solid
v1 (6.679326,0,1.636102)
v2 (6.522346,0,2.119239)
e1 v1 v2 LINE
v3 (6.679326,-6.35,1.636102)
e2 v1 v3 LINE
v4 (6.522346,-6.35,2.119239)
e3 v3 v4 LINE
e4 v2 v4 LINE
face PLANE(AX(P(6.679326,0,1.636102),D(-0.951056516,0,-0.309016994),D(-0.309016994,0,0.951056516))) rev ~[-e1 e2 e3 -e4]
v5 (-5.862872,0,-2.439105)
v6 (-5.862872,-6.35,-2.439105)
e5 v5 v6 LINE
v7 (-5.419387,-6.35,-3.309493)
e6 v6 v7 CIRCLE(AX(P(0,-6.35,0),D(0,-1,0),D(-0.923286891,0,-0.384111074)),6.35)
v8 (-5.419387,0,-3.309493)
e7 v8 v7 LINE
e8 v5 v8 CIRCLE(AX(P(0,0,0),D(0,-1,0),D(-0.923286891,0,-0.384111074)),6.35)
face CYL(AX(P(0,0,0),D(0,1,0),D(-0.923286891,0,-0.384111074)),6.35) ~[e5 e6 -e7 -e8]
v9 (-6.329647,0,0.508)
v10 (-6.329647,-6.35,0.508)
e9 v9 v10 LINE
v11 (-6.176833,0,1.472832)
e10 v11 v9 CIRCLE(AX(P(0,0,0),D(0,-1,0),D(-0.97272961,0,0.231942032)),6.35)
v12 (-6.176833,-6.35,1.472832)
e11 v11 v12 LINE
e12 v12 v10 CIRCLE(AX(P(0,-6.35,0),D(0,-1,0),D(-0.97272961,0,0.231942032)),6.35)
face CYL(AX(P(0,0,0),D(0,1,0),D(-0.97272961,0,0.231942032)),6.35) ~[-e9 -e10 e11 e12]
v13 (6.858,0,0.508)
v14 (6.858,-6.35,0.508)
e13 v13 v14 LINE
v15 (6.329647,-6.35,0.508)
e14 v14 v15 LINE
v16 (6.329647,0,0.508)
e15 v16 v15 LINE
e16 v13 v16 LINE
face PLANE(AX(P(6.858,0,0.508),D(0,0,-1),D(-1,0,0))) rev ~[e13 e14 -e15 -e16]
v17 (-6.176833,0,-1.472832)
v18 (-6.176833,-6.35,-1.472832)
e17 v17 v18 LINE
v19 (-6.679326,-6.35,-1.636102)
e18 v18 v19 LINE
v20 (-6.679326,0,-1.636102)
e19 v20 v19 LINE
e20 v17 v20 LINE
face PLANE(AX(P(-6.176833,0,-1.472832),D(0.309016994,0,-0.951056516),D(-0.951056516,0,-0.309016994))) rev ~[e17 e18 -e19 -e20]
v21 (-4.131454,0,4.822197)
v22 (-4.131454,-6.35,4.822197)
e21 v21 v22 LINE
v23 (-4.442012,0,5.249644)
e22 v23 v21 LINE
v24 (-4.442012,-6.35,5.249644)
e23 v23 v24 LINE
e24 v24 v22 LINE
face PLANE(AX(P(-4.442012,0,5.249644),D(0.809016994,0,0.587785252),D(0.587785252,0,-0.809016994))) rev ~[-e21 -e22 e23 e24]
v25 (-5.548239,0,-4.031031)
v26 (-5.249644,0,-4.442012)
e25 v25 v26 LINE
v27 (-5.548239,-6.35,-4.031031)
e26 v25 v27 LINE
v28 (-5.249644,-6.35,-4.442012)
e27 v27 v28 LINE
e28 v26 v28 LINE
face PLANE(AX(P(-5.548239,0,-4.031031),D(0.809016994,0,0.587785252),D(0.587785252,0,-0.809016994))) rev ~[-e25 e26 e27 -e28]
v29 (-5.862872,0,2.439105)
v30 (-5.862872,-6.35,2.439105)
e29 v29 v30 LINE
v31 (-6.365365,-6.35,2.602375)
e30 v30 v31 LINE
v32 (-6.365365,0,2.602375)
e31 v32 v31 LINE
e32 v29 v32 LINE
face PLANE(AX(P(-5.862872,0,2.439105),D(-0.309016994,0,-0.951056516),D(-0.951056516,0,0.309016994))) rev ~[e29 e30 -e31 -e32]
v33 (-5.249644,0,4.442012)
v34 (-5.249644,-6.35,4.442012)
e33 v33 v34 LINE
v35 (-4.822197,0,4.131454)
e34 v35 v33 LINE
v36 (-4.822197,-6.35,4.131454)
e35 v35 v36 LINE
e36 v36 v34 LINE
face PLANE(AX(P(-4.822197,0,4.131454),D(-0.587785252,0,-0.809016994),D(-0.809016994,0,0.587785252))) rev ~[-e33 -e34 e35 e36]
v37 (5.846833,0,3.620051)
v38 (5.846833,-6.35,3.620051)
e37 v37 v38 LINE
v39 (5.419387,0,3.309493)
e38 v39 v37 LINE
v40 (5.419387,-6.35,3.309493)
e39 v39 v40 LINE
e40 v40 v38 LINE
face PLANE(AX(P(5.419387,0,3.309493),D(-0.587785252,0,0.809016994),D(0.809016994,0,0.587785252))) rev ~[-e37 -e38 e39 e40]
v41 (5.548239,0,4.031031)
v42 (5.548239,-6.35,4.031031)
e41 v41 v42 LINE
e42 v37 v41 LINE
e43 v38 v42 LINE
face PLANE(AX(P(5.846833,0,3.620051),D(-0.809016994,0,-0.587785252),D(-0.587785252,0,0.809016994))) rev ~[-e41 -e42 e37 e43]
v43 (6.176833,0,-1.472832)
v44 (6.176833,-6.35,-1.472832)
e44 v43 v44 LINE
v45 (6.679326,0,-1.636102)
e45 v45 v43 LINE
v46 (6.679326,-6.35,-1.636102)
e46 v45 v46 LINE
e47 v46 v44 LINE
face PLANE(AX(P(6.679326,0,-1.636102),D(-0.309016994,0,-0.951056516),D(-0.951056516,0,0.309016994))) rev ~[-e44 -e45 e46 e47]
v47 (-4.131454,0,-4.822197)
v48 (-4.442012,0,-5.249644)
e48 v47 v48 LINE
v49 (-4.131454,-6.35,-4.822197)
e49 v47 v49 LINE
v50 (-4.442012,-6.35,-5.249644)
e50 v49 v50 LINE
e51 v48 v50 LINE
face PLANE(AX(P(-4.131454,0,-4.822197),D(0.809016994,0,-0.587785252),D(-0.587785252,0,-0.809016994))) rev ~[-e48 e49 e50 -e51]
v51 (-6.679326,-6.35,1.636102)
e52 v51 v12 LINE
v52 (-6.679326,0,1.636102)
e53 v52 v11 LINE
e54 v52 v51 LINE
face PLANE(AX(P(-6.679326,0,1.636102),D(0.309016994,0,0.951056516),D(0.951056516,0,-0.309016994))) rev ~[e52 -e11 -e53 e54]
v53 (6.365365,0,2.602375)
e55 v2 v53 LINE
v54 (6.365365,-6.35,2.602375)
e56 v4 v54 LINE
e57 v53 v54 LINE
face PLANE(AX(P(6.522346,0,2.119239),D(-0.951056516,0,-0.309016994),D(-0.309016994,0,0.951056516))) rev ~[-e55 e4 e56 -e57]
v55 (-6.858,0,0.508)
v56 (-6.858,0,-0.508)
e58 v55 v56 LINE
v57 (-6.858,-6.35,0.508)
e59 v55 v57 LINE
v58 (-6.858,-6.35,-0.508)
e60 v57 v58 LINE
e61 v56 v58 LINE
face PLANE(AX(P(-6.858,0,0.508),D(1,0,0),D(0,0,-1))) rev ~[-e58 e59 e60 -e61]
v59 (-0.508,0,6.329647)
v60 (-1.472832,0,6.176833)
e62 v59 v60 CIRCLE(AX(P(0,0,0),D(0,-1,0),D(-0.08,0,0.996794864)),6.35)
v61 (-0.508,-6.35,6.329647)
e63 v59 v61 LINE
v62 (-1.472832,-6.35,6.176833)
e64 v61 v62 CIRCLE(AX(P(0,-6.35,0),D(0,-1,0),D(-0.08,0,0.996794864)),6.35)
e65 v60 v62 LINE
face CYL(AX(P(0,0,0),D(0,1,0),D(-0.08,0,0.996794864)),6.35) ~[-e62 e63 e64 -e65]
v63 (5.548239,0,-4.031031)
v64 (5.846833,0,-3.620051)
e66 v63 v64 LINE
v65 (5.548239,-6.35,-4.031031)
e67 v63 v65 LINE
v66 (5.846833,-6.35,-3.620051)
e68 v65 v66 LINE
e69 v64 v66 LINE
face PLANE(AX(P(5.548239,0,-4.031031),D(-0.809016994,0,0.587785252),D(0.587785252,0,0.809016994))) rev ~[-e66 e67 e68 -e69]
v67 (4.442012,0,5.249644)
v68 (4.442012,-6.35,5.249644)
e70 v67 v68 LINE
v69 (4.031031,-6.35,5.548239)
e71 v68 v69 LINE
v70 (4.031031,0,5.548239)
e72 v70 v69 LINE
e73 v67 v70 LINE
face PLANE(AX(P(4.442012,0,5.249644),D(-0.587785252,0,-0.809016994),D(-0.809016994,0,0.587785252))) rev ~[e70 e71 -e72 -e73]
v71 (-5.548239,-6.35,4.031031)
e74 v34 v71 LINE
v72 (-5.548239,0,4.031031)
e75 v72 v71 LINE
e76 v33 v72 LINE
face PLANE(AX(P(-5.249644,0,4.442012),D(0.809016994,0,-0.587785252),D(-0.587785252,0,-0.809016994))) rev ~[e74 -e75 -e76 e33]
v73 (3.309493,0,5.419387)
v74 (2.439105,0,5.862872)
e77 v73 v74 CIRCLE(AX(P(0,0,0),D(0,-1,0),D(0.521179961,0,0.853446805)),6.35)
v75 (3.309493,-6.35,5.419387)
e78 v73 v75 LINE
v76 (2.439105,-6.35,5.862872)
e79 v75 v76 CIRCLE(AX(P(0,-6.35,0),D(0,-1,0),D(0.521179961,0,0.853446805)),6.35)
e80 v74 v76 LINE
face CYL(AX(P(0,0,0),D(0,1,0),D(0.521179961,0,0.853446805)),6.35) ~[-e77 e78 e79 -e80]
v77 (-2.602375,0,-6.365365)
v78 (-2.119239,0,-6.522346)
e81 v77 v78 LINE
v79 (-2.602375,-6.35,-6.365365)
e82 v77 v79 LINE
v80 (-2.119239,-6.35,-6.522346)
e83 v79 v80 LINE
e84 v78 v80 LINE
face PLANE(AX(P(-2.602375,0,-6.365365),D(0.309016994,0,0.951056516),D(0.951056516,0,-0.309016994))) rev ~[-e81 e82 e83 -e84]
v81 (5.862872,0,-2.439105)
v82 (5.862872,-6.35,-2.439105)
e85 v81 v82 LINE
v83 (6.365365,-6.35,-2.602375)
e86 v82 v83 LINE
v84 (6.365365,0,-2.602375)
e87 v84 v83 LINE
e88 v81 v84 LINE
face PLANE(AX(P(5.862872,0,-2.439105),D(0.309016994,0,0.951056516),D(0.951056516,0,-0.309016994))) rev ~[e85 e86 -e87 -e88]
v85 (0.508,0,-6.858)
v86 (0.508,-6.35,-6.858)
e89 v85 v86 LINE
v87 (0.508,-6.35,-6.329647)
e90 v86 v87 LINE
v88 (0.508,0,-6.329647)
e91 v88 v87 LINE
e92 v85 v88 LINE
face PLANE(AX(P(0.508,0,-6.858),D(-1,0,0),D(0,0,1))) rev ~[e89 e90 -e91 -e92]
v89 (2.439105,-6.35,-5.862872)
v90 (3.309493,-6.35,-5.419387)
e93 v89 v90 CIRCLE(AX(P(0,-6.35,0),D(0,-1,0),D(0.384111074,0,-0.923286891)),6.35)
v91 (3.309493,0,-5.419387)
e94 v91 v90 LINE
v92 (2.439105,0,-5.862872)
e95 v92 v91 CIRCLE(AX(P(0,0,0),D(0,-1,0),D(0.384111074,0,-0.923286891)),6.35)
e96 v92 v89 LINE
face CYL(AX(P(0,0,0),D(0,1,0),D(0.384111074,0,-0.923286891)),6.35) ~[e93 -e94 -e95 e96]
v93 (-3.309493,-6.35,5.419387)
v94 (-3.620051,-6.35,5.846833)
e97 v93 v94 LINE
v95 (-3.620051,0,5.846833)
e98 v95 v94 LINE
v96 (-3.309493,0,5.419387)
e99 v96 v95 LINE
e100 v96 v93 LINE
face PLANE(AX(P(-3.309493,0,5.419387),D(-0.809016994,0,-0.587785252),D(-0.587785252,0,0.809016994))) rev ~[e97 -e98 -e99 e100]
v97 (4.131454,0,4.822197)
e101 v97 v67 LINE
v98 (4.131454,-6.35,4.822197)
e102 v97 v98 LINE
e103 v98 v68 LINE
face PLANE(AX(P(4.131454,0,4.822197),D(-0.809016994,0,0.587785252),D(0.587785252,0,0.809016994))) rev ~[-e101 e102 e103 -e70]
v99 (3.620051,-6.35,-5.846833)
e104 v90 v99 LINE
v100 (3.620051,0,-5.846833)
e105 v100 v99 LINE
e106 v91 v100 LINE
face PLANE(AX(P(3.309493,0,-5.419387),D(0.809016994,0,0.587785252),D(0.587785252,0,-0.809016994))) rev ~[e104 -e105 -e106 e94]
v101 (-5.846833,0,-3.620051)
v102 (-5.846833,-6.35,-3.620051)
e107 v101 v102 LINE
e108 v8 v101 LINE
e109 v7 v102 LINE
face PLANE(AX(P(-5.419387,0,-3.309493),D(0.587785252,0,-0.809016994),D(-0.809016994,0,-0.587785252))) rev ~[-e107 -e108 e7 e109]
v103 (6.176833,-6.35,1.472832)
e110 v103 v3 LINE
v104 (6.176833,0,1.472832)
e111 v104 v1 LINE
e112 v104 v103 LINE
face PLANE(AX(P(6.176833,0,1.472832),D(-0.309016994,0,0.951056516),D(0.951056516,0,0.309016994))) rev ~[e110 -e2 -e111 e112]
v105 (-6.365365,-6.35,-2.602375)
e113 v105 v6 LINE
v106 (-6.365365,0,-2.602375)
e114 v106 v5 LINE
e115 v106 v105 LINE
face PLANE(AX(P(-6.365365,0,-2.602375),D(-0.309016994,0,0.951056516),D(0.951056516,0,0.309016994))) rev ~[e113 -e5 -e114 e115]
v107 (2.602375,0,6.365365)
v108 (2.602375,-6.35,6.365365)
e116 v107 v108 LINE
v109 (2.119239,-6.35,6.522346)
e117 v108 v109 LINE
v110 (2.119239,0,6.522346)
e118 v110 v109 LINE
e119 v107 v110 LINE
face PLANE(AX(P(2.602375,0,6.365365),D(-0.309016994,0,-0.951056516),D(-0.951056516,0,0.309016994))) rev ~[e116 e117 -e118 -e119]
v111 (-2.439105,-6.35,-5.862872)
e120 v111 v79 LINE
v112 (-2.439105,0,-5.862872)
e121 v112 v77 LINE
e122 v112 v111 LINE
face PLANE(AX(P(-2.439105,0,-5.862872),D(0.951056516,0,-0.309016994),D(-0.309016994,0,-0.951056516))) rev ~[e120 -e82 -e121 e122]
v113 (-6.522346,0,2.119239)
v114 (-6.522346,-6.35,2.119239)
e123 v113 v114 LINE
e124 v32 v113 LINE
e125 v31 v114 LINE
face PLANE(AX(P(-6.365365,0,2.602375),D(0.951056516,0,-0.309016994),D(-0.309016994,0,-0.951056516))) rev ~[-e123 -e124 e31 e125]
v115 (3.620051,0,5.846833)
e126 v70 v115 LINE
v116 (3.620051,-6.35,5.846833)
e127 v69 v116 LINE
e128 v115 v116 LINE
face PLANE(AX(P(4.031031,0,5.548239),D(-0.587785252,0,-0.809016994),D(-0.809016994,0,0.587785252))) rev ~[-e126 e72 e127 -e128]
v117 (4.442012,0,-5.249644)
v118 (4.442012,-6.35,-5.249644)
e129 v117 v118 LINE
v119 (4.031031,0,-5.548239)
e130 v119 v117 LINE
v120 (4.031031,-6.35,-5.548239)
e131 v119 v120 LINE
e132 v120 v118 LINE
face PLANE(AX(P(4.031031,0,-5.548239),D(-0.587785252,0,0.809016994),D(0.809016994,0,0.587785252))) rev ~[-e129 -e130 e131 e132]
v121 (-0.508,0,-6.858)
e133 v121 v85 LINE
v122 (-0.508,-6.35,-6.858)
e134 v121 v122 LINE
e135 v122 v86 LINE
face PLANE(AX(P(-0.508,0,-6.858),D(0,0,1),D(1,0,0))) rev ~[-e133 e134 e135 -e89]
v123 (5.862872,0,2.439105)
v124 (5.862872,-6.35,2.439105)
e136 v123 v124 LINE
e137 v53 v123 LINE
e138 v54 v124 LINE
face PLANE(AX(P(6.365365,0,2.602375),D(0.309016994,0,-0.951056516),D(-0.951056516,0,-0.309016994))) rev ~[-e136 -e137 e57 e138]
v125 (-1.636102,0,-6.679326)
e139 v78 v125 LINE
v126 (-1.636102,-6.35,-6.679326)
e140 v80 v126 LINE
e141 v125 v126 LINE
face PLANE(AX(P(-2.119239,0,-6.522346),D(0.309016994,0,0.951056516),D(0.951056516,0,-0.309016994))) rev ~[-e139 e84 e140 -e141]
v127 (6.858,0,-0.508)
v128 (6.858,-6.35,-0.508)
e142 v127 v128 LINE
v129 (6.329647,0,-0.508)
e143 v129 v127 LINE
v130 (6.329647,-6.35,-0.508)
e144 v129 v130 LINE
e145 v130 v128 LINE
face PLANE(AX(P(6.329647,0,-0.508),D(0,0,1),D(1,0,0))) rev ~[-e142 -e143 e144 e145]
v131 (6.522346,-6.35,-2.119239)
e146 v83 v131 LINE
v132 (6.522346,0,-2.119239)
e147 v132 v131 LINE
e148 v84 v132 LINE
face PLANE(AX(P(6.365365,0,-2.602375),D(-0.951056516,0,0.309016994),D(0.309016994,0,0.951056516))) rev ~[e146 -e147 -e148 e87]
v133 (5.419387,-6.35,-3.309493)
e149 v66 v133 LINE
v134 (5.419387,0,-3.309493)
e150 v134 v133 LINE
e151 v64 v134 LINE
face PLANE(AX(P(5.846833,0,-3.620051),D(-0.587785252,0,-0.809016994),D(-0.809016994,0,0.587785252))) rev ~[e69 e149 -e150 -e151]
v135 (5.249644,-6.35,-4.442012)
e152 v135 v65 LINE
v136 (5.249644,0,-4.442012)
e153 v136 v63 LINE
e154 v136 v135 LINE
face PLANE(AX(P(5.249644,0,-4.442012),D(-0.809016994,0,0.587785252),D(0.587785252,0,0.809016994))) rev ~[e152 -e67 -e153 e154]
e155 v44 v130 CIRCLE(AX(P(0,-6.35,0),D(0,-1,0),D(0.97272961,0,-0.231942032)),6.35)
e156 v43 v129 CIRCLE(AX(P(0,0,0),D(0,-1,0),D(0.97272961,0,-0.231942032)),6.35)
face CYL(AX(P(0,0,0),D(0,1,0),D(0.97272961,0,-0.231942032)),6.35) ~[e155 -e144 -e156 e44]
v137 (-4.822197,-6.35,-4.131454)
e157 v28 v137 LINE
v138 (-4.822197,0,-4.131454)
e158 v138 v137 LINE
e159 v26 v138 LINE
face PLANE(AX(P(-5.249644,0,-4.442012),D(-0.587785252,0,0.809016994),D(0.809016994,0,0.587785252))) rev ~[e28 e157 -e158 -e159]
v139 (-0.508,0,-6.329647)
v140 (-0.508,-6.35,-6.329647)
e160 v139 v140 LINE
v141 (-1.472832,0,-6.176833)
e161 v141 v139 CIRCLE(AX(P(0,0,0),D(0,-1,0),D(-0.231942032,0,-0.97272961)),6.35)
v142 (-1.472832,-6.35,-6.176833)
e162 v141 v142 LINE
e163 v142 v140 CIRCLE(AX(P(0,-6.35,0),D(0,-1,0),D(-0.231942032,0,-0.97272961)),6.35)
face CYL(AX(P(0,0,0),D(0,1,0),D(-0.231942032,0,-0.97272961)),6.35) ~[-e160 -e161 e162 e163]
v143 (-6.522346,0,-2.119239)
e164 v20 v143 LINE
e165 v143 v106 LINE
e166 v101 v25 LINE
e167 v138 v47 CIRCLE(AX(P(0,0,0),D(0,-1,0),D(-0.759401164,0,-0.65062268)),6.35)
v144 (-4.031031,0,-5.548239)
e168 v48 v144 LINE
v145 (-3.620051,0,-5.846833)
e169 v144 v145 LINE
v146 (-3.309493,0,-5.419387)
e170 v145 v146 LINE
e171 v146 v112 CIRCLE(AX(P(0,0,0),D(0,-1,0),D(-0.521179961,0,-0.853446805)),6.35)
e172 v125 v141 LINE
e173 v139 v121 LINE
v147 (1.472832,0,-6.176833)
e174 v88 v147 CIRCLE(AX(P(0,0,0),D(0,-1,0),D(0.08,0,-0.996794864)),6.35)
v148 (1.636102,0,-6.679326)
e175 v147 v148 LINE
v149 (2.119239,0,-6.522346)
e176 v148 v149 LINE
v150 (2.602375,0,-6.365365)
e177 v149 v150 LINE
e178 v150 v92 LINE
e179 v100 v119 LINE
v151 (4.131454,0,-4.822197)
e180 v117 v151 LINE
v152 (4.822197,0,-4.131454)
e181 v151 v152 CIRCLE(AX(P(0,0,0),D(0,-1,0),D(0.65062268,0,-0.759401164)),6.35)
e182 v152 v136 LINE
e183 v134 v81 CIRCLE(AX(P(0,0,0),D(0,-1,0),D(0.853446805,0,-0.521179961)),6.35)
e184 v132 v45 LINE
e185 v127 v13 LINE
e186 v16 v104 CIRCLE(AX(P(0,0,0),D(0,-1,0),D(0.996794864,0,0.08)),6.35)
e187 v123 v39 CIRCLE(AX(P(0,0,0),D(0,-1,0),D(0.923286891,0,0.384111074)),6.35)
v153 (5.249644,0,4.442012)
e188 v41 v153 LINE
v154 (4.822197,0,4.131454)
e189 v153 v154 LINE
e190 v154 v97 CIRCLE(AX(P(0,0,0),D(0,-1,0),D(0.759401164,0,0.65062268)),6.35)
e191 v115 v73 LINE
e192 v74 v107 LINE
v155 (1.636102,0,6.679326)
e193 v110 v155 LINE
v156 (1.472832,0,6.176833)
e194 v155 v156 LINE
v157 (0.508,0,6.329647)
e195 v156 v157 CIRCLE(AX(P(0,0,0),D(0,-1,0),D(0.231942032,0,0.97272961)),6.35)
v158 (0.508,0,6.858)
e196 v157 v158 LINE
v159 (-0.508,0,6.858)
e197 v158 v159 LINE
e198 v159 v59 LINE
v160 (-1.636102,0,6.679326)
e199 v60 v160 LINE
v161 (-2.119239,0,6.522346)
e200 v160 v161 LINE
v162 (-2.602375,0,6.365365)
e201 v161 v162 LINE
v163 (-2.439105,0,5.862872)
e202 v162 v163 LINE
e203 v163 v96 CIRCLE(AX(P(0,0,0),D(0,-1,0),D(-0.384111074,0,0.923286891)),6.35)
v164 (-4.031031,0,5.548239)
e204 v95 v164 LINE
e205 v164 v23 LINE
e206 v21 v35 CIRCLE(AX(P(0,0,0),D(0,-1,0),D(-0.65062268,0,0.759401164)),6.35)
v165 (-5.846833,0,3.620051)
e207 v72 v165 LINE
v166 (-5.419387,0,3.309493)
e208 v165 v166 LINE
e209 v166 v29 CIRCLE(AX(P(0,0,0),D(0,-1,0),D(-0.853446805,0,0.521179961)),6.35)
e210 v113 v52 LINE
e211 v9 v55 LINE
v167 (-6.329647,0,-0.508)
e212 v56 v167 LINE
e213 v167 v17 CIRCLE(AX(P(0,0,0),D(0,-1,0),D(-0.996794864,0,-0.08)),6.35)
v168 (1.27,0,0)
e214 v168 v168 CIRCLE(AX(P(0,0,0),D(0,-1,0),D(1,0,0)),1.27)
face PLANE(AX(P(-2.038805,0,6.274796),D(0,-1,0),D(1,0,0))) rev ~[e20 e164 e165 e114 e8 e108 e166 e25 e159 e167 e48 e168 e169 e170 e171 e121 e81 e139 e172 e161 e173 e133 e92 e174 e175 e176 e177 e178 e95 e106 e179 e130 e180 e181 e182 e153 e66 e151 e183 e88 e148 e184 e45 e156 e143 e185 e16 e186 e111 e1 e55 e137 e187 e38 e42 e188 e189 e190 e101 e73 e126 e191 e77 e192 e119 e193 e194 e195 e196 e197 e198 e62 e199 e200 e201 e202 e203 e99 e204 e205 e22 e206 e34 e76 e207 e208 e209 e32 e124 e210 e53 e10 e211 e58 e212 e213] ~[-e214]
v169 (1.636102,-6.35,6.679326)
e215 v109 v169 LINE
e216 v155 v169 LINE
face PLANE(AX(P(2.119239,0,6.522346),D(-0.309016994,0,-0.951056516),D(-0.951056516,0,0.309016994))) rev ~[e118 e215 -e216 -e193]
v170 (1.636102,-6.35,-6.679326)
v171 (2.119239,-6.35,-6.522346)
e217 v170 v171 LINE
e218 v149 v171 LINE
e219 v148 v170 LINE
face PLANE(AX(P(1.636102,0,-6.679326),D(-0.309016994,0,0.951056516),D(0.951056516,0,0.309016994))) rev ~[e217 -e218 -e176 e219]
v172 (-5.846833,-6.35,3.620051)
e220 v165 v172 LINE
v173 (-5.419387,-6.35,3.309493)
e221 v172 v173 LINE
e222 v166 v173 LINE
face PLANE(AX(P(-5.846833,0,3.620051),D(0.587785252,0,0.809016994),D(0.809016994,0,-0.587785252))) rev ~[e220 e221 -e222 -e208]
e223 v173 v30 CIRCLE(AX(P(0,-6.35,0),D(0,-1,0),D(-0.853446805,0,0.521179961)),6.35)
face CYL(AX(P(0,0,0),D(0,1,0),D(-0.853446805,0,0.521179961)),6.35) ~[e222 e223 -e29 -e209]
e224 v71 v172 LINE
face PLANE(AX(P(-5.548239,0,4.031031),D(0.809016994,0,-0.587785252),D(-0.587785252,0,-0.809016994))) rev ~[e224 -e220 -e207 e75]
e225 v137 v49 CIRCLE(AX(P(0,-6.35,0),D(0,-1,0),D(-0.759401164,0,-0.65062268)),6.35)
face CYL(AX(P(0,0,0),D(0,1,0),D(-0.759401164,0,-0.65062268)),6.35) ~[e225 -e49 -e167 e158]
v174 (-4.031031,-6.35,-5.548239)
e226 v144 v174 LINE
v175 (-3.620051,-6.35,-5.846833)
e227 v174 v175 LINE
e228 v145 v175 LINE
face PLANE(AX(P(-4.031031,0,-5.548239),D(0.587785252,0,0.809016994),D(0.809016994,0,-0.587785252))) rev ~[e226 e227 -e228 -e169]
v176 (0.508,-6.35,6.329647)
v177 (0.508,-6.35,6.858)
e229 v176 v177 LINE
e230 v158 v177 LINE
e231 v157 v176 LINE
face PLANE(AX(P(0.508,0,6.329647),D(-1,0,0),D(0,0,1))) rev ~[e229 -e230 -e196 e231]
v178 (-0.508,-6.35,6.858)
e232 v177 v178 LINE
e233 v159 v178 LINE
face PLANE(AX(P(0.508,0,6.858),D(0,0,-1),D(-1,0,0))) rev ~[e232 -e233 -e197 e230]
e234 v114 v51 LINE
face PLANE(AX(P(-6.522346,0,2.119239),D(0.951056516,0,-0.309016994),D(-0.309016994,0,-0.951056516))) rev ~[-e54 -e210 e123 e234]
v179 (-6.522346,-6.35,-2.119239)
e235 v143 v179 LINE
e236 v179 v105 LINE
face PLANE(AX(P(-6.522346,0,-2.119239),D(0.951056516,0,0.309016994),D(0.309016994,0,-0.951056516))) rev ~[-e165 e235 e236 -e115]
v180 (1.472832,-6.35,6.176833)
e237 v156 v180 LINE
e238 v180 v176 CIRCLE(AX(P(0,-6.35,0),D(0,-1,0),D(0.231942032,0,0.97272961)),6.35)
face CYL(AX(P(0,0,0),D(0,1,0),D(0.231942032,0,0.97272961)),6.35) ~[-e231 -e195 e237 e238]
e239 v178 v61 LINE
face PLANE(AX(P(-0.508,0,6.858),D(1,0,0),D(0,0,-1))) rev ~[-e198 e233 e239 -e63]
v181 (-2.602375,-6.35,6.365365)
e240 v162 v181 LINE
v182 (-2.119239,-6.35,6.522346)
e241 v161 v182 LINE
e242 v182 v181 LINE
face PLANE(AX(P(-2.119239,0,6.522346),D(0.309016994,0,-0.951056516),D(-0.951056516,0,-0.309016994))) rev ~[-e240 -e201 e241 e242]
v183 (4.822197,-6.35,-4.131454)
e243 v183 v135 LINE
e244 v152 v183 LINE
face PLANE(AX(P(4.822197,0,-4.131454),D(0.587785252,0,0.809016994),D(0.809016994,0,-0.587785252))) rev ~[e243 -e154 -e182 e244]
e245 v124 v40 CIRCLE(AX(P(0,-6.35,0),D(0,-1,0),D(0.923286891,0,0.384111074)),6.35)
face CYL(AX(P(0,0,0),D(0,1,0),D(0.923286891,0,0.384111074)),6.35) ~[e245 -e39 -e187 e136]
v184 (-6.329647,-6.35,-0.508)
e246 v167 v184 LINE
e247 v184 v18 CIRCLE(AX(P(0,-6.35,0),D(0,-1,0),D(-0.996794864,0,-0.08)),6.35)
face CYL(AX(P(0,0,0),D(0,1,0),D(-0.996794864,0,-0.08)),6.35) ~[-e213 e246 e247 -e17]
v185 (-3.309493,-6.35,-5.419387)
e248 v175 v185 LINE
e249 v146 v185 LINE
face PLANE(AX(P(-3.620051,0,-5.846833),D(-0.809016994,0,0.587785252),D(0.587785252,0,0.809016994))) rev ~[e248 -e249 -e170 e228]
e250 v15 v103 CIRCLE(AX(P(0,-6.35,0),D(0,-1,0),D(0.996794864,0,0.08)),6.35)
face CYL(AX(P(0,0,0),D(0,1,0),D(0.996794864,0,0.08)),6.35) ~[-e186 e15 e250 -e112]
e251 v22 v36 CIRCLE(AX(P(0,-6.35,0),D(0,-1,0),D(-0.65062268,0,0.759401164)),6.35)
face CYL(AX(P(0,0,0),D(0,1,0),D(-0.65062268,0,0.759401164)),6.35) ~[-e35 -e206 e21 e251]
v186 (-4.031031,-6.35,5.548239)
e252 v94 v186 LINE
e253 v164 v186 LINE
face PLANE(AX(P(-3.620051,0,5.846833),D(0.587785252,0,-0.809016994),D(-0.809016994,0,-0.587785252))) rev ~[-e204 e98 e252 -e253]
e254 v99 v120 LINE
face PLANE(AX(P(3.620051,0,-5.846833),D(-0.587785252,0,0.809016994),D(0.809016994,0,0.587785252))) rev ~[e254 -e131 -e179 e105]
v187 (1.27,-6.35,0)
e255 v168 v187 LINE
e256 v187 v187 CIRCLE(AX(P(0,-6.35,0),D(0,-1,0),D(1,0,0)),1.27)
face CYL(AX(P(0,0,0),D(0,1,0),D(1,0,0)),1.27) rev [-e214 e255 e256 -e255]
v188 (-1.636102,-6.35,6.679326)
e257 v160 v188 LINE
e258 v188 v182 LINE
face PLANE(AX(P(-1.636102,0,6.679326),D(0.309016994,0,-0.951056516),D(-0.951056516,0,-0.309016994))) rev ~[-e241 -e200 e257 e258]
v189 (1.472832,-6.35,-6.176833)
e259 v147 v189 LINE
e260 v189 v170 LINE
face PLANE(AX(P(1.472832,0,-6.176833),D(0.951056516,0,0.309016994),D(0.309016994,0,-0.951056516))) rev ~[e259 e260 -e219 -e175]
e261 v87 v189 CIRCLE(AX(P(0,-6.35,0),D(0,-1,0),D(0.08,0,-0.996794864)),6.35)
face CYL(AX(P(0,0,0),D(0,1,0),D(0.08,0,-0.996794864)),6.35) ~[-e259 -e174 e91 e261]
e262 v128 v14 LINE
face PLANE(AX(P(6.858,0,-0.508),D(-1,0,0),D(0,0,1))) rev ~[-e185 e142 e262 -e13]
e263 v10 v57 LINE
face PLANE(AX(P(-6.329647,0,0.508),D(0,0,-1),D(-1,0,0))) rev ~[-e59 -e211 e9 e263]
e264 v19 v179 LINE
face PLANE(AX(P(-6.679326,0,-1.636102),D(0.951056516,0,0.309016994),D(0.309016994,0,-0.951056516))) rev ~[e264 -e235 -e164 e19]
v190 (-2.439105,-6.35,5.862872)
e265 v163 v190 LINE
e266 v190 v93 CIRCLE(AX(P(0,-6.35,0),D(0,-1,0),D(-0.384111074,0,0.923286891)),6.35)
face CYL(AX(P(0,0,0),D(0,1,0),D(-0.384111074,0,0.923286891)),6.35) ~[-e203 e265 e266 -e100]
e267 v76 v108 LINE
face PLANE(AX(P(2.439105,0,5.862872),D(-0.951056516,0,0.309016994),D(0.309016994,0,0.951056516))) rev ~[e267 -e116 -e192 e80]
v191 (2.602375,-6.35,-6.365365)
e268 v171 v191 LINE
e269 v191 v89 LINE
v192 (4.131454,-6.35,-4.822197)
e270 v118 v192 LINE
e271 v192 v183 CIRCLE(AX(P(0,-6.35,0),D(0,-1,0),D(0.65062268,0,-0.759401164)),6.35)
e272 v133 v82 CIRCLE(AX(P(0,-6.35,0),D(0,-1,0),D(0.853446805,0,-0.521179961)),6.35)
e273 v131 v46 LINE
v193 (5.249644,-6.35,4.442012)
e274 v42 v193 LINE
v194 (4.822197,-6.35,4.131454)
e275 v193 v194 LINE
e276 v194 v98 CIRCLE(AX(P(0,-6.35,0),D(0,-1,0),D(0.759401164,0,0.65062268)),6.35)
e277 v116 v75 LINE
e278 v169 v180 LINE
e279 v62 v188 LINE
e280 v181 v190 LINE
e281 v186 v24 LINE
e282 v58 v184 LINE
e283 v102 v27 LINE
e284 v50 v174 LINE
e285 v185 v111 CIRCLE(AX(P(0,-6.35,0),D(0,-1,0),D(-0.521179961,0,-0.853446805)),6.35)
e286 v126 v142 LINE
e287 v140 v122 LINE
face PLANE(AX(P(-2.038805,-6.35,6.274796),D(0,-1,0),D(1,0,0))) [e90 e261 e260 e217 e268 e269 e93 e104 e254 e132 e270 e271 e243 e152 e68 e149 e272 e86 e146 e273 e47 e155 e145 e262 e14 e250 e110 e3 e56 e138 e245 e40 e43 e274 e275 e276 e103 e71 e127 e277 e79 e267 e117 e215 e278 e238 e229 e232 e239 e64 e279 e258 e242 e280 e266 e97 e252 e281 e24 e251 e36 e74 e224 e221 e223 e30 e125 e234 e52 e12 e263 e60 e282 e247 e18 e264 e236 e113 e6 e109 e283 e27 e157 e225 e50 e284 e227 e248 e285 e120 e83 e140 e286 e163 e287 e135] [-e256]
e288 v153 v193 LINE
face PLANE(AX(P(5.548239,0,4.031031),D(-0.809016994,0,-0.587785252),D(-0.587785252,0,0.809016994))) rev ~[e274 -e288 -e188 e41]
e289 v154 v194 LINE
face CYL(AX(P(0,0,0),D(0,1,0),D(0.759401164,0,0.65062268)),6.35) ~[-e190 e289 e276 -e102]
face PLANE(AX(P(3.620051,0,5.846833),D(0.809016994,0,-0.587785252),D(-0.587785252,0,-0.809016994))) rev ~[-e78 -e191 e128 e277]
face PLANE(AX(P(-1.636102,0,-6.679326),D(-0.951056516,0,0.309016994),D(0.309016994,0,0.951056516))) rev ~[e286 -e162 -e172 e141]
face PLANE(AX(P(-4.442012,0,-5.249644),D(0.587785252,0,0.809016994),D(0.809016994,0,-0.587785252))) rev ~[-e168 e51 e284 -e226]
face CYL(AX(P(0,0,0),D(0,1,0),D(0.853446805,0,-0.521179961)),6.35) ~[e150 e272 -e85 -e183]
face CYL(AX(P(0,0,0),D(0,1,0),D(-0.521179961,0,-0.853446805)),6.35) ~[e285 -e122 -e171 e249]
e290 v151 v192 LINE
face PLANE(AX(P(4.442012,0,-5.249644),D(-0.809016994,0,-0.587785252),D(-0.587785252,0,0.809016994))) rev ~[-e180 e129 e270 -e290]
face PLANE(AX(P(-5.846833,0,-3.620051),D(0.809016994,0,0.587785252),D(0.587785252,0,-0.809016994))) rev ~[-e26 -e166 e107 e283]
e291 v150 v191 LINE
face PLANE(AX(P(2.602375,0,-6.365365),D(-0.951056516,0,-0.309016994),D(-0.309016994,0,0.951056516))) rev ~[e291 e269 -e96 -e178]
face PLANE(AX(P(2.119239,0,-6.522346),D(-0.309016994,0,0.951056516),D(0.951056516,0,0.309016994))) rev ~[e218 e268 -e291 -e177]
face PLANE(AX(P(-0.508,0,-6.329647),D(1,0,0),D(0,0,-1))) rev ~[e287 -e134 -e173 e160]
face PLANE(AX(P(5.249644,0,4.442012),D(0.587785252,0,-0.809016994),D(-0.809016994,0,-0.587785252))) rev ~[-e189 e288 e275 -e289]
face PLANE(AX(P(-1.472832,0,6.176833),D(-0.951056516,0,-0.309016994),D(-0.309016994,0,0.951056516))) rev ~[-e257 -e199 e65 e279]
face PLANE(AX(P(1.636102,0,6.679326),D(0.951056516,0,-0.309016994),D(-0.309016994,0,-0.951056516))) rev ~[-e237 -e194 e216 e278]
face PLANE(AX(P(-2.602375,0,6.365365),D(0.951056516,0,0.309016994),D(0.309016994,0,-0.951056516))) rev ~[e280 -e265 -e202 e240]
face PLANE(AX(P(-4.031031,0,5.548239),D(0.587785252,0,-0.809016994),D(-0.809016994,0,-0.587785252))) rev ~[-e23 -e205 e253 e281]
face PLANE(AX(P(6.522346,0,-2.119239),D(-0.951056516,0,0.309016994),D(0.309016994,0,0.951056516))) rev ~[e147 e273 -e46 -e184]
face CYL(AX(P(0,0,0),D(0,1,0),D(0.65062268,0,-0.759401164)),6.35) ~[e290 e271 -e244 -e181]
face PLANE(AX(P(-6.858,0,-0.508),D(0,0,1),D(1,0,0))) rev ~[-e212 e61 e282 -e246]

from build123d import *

# Parameters (mm, degrees)
F0_R     = 1.27
F1_DEPTH = 6.35


# Not quite as in the source:
# - a feature names something its author has since deleted; it is built from what else it names


with BuildPart() as f1:
    # F0 (on Front) → F1 (new body)
    with BuildSketch(Plane.XZ):
        with BuildLine():
            ThreePointArc((-2.4391053202, 5.8628717568), (-1.9622579143, 6.0392088785), (-1.4728318996, 6.1768330231))
            Line((-1.4728318996, 6.1768330231), (-1.6361018371, 6.6793262219))
            Line((-1.6361018371, 6.6793262219), (-2.1192385474, 6.5223455888))
            Line((-2.1192385474, 6.5223455888), (-2.6023752577, 6.3653649556))
            Line((-2.6023752577, 6.3653649556), (-2.4391053202, 5.8628717568))
        make_face()
        with BuildLine():
            ThreePointArc((-0.508, 6.3296473835), (-0.2542037711, 6.3449098057), (0, 6.35))
            Line((0, 6.35), (0, 6.858))
            Line((0, 6.858), (-0.508, 6.858))
            Line((-0.508, 6.858), (-0.508, 6.3296473835))
        make_face()
        with BuildLine():
            ThreePointArc((0, 6.35), (0.2542037711, 6.3449098057), (0.508, 6.3296473835))
            Line((0.508, 6.3296473835), (0.508, 6.858))
            Line((0.508, 6.858), (0, 6.858))
            Line((0, 6.858), (0, 6.35))
        make_face()
        with BuildLine():
            ThreePointArc((1.4728318996, 6.1768330231), (1.9622579143, 6.0392088785), (2.4391053202, 5.8628717568))
            Line((2.4391053202, 5.8628717568), (2.6023752577, 6.3653649556))
            Line((2.6023752577, 6.3653649556), (2.1192385474, 6.5223455888))
            Line((2.1192385474, 6.5223455888), (1.6361018371, 6.6793262219))
            Line((1.6361018371, 6.6793262219), (1.4728318996, 6.1768330231))
        make_face()
        with BuildLine():
            ThreePointArc((3.3094927511, 5.4193872099), (3.7324363521, 5.1372579143), (4.1314540174, 4.8221973935))
            Line((4.1314540174, 4.8221973935), (4.4420118934, 5.2496436393))
            Line((4.4420118934, 5.2496436393), (4.0310312602, 5.5482385474))
            Line((4.0310312602, 5.5482385474), (3.6200506271, 5.8468334556))
            Line((3.6200506271, 5.8468334556), (3.3094927511, 5.4193872099))
        make_face()
        with BuildLine():
            ThreePointArc((4.8221973935, 4.1314540174), (5.1372579143, 3.7324363521), (5.4193872099, 3.3094927511))
            Line((5.4193872099, 3.3094927511), (5.8468334556, 3.6200506271))
            Line((5.8468334556, 3.6200506271), (5.5482385474, 4.0310312602))
            Line((5.5482385474, 4.0310312602), (5.2496436393, 4.4420118934))
            Line((5.2496436393, 4.4420118934), (4.8221973935, 4.1314540174))
        make_face()
        with BuildLine():
            Line((0.508, -6.858), (0.508, -6.3296473835))
            ThreePointArc((0.508, -6.3296473835), (0, -6.35), (-0.508, -6.3296473835))
            Line((-0.508, -6.3296473835), (-0.508, -6.858))
            Line((-0.508, -6.858), (0, -6.858))
            Line((0, -6.858), (0.508, -6.858))
        make_face()
        with BuildLine():
            Line((2.6023752577, -6.3653649556), (2.4391053202, -5.8628717568))
            ThreePointArc((2.4391053202, -5.8628717568), (1.9622579143, -6.0392088785), (1.4728318996, -6.1768330231))
            Line((1.4728318996, -6.1768330231), (1.6361018371, -6.6793262219))
            Line((1.6361018371, -6.6793262219), (2.1192385474, -6.5223455888))
            Line((2.1192385474, -6.5223455888), (2.6023752577, -6.3653649556))
        make_face()
        with BuildLine():
            Line((4.4420118934, -5.2496436393), (4.1314540174, -4.8221973935))
            ThreePointArc((4.1314540174, -4.8221973935), (3.7324363521, -5.1372579143), (3.3094927511, -5.4193872099))
            Line((3.3094927511, -5.4193872099), (3.6200506271, -5.8468334556))
            Line((3.6200506271, -5.8468334556), (4.0310312602, -5.5482385474))
            Line((4.0310312602, -5.5482385474), (4.4420118934, -5.2496436393))
        make_face()
        with BuildLine():
            Line((5.8468334556, -3.6200506271), (5.4193872099, -3.3094927511))
            ThreePointArc((5.4193872099, -3.3094927511), (5.1372579143, -3.7324363521), (4.8221973935, -4.1314540174))
            Line((4.8221973935, -4.1314540174), (5.2496436393, -4.4420118934))
            Line((5.2496436393, -4.4420118934), (5.5482385474, -4.0310312602))
            Line((5.5482385474, -4.0310312602), (5.8468334556, -3.6200506271))
        make_face()
        with BuildLine():
            Line((6.6793262219, -1.6361018371), (6.1768330231, -1.4728318996))
            ThreePointArc((6.1768330231, -1.4728318996), (6.0392088785, -1.9622579143), (5.8628717568, -2.4391053202))
            Line((5.8628717568, -2.4391053202), (6.3653649556, -2.6023752577))
            Line((6.3653649556, -2.6023752577), (6.5223455888, -2.1192385474))
            Line((6.5223455888, -2.1192385474), (6.6793262219, -1.6361018371))
        make_face()
        with BuildLine():
            ThreePointArc((6.3296473835, 0.508), (6.3449098057, 0.2542037711), (6.35, 0))
            ThreePointArc((6.35, 0), (6.3449098057, -0.2542037711), (6.3296473835, -0.508))
            Line((6.3296473835, -0.508), (6.858, -0.508))
            Line((6.858, -0.508), (6.858, 0))
            Line((6.858, 0), (6.858, 0.508))
            Line((6.858, 0.508), (6.3296473835, 0.508))
        make_face()
        with BuildLine():
            ThreePointArc((5.8628717568, 2.4391053202), (6.0392088785, 1.9622579143), (6.1768330231, 1.4728318996))
            Line((6.1768330231, 1.4728318996), (6.6793262219, 1.6361018371))
            Line((6.6793262219, 1.6361018371), (6.5223455888, 2.1192385474))
            Line((6.5223455888, 2.1192385474), (6.3653649556, 2.6023752577))
            Line((6.3653649556, 2.6023752577), (5.8628717568, 2.4391053202))
        make_face()
        with BuildLine():
            ThreePointArc((-4.1314540174, 4.8221973935), (-3.7324363521, 5.1372579143), (-3.3094927511, 5.4193872099))
            Line((-3.3094927511, 5.4193872099), (-3.6200506271, 5.8468334556))
            Line((-3.6200506271, 5.8468334556), (-4.0310312602, 5.5482385474))
            Line((-4.0310312602, 5.5482385474), (-4.4420118934, 5.2496436393))
            Line((-4.4420118934, 5.2496436393), (-4.1314540174, 4.8221973935))
        make_face()
        with BuildLine():
            ThreePointArc((-5.4193872099, 3.3094927511), (-5.1372579143, 3.7324363521), (-4.8221973935, 4.1314540174))
            Line((-4.8221973935, 4.1314540174), (-5.2496436393, 4.4420118934))
            Line((-5.2496436393, 4.4420118934), (-5.5482385474, 4.0310312602))
            Line((-5.5482385474, 4.0310312602), (-5.8468334556, 3.6200506271))
            Line((-5.8468334556, 3.6200506271), (-5.4193872099, 3.3094927511))
        make_face()
        with BuildLine():
            ThreePointArc((-6.1768330231, 1.4728318996), (-6.0392088785, 1.9622579143), (-5.8628717568, 2.4391053202))
            Line((-5.8628717568, 2.4391053202), (-6.3653649556, 2.6023752577))
            Line((-6.3653649556, 2.6023752577), (-6.5223455888, 2.1192385474))
            Line((-6.5223455888, 2.1192385474), (-6.6793262219, 1.6361018371))
            Line((-6.6793262219, 1.6361018371), (-6.1768330231, 1.4728318996))
        make_face()
        with BuildLine():
            Line((-6.858, -0.508), (-6.3296473835, -0.508))
            ThreePointArc((-6.3296473835, -0.508), (-6.35, 0), (-6.3296473835, 0.508))
            Line((-6.3296473835, 0.508), (-6.858, 0.508))
            Line((-6.858, 0.508), (-6.858, 0))
            Line((-6.858, 0), (-6.858, -0.508))
        make_face()
        with BuildLine():
            ThreePointArc((6.3296473835, -0.508), (6.3449098057, -0.2542037711), (6.35, 0))
            ThreePointArc((6.35, 0), (6.3449098057, 0.2542037711), (6.3296473835, 0.508))
            ThreePointArc((6.3296473835, 0.508), (6.2718209628, 0.993358853), (6.1768330231, 1.4728318996))
            ThreePointArc((6.1768330231, 1.4728318996), (6.0392088785, 1.9622579143), (5.8628717568, 2.4391053202))
            ThreePointArc((5.8628717568, 2.4391053202), (5.6578914286, 2.8828396733), (5.4193872099, 3.3094927511))
            ThreePointArc((5.4193872099, 3.3094927511), (5.1372579143, 3.7324363521), (4.8221973935, 4.1314540174))
            ThreePointArc((4.8221973935, 4.1314540174), (4.4901280605, 4.4901280605), (4.1314540174, 4.8221973935))
            ThreePointArc((4.1314540174, 4.8221973935), (3.7324363521, 5.1372579143), (3.3094927511, 5.4193872099))
            ThreePointArc((3.3094927511, 5.4193872099), (2.8828396733, 5.6578914286), (2.4391053202, 5.8628717568))
            ThreePointArc((2.4391053202, 5.8628717568), (1.9622579143, 6.0392088785), (1.4728318996, 6.1768330231))
            ThreePointArc((1.4728318996, 6.1768330231), (0.993358853, 6.2718209628), (0.508, 6.3296473835))
            ThreePointArc((0.508, 6.3296473835), (0.2542037711, 6.3449098057), (0, 6.35))
            ThreePointArc((0, 6.35), (-0.2542037711, 6.3449098057), (-0.508, 6.3296473835))
            ThreePointArc((-0.508, 6.3296473835), (-0.993358853, 6.2718209628), (-1.4728318996, 6.1768330231))
            ThreePointArc((-1.4728318996, 6.1768330231), (-1.9622579143, 6.0392088785), (-2.4391053202, 5.8628717568))
            ThreePointArc((-2.4391053202, 5.8628717568), (-2.8828396733, 5.6578914286), (-3.3094927511, 5.4193872099))
            ThreePointArc((-3.3094927511, 5.4193872099), (-3.7324363521, 5.1372579143), (-4.1314540174, 4.8221973935))
            ThreePointArc((-4.1314540174, 4.8221973935), (-4.4901280605, 4.4901280605), (-4.8221973935, 4.1314540174))
            ThreePointArc((-4.8221973935, 4.1314540174), (-5.1372579143, 3.7324363521), (-5.4193872099, 3.3094927511))
            ThreePointArc((-5.4193872099, 3.3094927511), (-5.6578914286, 2.8828396733), (-5.8628717568, 2.4391053202))
            ThreePointArc((-5.8628717568, 2.4391053202), (-6.0392088785, 1.9622579143), (-6.1768330231, 1.4728318996))
            ThreePointArc((-6.1768330231, 1.4728318996), (-6.2718209628, 0.993358853), (-6.3296473835, 0.508))
            ThreePointArc((-6.3296473835, 0.508), (-6.35, 0), (-6.3296473835, -0.508))
            ThreePointArc((-6.3296473835, -0.508), (-6.2718209628, -0.993358853), (-6.1768330231, -1.4728318996))
            ThreePointArc((-6.1768330231, -1.4728318996), (-6.0392088785, -1.9622579143), (-5.8628717568, -2.4391053202))
            ThreePointArc((-5.8628717568, -2.4391053202), (-5.6578914286, -2.8828396733), (-5.4193872099, -3.3094927511))
            ThreePointArc((-5.4193872099, -3.3094927511), (-5.1372579143, -3.7324363521), (-4.8221973935, -4.1314540174))
            ThreePointArc((-4.8221973935, -4.1314540174), (-4.4901280605, -4.4901280605), (-4.1314540174, -4.8221973935))
            ThreePointArc((-4.1314540174, -4.8221973935), (-3.7324363521, -5.1372579143), (-3.3094927511, -5.4193872099))
            ThreePointArc((-3.3094927511, -5.4193872099), (-2.8828396733, -5.6578914286), (-2.4391053202, -5.8628717568))
            ThreePointArc((-2.4391053202, -5.8628717568), (-1.9622579143, -6.0392088785), (-1.4728318996, -6.1768330231))
            ThreePointArc((-1.4728318996, -6.1768330231), (-0.993358853, -6.2718209628), (-0.508, -6.3296473835))
            ThreePointArc((-0.508, -6.3296473835), (0, -6.35), (0.508, -6.3296473835))
            ThreePointArc((0.508, -6.3296473835), (0.993358853, -6.2718209628), (1.4728318996, -6.1768330231))
            ThreePointArc((1.4728318996, -6.1768330231), (1.9622579143, -6.0392088785), (2.4391053202, -5.8628717568))
            ThreePointArc((2.4391053202, -5.8628717568), (2.8828396733, -5.6578914286), (3.3094927511, -5.4193872099))
            ThreePointArc((3.3094927511, -5.4193872099), (3.7324363521, -5.1372579143), (4.1314540174, -4.8221973935))
            ThreePointArc((4.1314540174, -4.8221973935), (4.4901280605, -4.4901280605), (4.8221973935, -4.1314540174))
            ThreePointArc((4.8221973935, -4.1314540174), (5.1372579143, -3.7324363521), (5.4193872099, -3.3094927511))
            ThreePointArc((5.4193872099, -3.3094927511), (5.6578914286, -2.8828396733), (5.8628717568, -2.4391053202))
            ThreePointArc((5.8628717568, -2.4391053202), (6.0392088785, -1.9622579143), (6.1768330231, -1.4728318996))
            ThreePointArc((6.1768330231, -1.4728318996), (6.2718209628, -0.993358853), (6.3296473835, -0.508))
        make_face()
        Circle(F0_R, mode=Mode.SUBTRACT)
        with BuildLine():
            Line((-6.3653649556, -2.6023752577), (-5.8628717568, -2.4391053202))
            ThreePointArc((-5.8628717568, -2.4391053202), (-6.0392088785, -1.9622579143), (-6.1768330231, -1.4728318996))
            Line((-6.1768330231, -1.4728318996), (-6.6793262219, -1.6361018371))
            Line((-6.6793262219, -1.6361018371), (-6.5223455888, -2.1192385474))
            Line((-6.5223455888, -2.1192385474), (-6.3653649556, -2.6023752577))
        make_face()
        with BuildLine():
            Line((-5.2496436393, -4.4420118934), (-4.8221973935, -4.1314540174))
            ThreePointArc((-4.8221973935, -4.1314540174), (-5.1372579143, -3.7324363521), (-5.4193872099, -3.3094927511))
            Line((-5.4193872099, -3.3094927511), (-5.8468334556, -3.6200506271))
            Line((-5.8468334556, -3.6200506271), (-5.5482385474, -4.0310312602))
            Line((-5.5482385474, -4.0310312602), (-5.2496436393, -4.4420118934))
        make_face()
        with BuildLine():
            Line((-3.6200506271, -5.8468334556), (-3.3094927511, -5.4193872099))
            ThreePointArc((-3.3094927511, -5.4193872099), (-3.7324363521, -5.1372579143), (-4.1314540174, -4.8221973935))
            Line((-4.1314540174, -4.8221973935), (-4.4420118934, -5.2496436393))
            Line((-4.4420118934, -5.2496436393), (-4.0310312602, -5.5482385474))
            Line((-4.0310312602, -5.5482385474), (-3.6200506271, -5.8468334556))
        make_face()
        with BuildLine():
            Line((-1.6361018371, -6.6793262219), (-1.4728318996, -6.1768330231))
            ThreePointArc((-1.4728318996, -6.1768330231), (-1.9622579143, -6.0392088785), (-2.4391053202, -5.8628717568))
            Line((-2.4391053202, -5.8628717568), (-2.6023752577, -6.3653649556))
            Line((-2.6023752577, -6.3653649556), (-2.1192385474, -6.5223455888))
            Line((-2.1192385474, -6.5223455888), (-1.6361018371, -6.6793262219))
        make_face()
    extrude(amount=F1_DEPTH)


solid = f1.part
